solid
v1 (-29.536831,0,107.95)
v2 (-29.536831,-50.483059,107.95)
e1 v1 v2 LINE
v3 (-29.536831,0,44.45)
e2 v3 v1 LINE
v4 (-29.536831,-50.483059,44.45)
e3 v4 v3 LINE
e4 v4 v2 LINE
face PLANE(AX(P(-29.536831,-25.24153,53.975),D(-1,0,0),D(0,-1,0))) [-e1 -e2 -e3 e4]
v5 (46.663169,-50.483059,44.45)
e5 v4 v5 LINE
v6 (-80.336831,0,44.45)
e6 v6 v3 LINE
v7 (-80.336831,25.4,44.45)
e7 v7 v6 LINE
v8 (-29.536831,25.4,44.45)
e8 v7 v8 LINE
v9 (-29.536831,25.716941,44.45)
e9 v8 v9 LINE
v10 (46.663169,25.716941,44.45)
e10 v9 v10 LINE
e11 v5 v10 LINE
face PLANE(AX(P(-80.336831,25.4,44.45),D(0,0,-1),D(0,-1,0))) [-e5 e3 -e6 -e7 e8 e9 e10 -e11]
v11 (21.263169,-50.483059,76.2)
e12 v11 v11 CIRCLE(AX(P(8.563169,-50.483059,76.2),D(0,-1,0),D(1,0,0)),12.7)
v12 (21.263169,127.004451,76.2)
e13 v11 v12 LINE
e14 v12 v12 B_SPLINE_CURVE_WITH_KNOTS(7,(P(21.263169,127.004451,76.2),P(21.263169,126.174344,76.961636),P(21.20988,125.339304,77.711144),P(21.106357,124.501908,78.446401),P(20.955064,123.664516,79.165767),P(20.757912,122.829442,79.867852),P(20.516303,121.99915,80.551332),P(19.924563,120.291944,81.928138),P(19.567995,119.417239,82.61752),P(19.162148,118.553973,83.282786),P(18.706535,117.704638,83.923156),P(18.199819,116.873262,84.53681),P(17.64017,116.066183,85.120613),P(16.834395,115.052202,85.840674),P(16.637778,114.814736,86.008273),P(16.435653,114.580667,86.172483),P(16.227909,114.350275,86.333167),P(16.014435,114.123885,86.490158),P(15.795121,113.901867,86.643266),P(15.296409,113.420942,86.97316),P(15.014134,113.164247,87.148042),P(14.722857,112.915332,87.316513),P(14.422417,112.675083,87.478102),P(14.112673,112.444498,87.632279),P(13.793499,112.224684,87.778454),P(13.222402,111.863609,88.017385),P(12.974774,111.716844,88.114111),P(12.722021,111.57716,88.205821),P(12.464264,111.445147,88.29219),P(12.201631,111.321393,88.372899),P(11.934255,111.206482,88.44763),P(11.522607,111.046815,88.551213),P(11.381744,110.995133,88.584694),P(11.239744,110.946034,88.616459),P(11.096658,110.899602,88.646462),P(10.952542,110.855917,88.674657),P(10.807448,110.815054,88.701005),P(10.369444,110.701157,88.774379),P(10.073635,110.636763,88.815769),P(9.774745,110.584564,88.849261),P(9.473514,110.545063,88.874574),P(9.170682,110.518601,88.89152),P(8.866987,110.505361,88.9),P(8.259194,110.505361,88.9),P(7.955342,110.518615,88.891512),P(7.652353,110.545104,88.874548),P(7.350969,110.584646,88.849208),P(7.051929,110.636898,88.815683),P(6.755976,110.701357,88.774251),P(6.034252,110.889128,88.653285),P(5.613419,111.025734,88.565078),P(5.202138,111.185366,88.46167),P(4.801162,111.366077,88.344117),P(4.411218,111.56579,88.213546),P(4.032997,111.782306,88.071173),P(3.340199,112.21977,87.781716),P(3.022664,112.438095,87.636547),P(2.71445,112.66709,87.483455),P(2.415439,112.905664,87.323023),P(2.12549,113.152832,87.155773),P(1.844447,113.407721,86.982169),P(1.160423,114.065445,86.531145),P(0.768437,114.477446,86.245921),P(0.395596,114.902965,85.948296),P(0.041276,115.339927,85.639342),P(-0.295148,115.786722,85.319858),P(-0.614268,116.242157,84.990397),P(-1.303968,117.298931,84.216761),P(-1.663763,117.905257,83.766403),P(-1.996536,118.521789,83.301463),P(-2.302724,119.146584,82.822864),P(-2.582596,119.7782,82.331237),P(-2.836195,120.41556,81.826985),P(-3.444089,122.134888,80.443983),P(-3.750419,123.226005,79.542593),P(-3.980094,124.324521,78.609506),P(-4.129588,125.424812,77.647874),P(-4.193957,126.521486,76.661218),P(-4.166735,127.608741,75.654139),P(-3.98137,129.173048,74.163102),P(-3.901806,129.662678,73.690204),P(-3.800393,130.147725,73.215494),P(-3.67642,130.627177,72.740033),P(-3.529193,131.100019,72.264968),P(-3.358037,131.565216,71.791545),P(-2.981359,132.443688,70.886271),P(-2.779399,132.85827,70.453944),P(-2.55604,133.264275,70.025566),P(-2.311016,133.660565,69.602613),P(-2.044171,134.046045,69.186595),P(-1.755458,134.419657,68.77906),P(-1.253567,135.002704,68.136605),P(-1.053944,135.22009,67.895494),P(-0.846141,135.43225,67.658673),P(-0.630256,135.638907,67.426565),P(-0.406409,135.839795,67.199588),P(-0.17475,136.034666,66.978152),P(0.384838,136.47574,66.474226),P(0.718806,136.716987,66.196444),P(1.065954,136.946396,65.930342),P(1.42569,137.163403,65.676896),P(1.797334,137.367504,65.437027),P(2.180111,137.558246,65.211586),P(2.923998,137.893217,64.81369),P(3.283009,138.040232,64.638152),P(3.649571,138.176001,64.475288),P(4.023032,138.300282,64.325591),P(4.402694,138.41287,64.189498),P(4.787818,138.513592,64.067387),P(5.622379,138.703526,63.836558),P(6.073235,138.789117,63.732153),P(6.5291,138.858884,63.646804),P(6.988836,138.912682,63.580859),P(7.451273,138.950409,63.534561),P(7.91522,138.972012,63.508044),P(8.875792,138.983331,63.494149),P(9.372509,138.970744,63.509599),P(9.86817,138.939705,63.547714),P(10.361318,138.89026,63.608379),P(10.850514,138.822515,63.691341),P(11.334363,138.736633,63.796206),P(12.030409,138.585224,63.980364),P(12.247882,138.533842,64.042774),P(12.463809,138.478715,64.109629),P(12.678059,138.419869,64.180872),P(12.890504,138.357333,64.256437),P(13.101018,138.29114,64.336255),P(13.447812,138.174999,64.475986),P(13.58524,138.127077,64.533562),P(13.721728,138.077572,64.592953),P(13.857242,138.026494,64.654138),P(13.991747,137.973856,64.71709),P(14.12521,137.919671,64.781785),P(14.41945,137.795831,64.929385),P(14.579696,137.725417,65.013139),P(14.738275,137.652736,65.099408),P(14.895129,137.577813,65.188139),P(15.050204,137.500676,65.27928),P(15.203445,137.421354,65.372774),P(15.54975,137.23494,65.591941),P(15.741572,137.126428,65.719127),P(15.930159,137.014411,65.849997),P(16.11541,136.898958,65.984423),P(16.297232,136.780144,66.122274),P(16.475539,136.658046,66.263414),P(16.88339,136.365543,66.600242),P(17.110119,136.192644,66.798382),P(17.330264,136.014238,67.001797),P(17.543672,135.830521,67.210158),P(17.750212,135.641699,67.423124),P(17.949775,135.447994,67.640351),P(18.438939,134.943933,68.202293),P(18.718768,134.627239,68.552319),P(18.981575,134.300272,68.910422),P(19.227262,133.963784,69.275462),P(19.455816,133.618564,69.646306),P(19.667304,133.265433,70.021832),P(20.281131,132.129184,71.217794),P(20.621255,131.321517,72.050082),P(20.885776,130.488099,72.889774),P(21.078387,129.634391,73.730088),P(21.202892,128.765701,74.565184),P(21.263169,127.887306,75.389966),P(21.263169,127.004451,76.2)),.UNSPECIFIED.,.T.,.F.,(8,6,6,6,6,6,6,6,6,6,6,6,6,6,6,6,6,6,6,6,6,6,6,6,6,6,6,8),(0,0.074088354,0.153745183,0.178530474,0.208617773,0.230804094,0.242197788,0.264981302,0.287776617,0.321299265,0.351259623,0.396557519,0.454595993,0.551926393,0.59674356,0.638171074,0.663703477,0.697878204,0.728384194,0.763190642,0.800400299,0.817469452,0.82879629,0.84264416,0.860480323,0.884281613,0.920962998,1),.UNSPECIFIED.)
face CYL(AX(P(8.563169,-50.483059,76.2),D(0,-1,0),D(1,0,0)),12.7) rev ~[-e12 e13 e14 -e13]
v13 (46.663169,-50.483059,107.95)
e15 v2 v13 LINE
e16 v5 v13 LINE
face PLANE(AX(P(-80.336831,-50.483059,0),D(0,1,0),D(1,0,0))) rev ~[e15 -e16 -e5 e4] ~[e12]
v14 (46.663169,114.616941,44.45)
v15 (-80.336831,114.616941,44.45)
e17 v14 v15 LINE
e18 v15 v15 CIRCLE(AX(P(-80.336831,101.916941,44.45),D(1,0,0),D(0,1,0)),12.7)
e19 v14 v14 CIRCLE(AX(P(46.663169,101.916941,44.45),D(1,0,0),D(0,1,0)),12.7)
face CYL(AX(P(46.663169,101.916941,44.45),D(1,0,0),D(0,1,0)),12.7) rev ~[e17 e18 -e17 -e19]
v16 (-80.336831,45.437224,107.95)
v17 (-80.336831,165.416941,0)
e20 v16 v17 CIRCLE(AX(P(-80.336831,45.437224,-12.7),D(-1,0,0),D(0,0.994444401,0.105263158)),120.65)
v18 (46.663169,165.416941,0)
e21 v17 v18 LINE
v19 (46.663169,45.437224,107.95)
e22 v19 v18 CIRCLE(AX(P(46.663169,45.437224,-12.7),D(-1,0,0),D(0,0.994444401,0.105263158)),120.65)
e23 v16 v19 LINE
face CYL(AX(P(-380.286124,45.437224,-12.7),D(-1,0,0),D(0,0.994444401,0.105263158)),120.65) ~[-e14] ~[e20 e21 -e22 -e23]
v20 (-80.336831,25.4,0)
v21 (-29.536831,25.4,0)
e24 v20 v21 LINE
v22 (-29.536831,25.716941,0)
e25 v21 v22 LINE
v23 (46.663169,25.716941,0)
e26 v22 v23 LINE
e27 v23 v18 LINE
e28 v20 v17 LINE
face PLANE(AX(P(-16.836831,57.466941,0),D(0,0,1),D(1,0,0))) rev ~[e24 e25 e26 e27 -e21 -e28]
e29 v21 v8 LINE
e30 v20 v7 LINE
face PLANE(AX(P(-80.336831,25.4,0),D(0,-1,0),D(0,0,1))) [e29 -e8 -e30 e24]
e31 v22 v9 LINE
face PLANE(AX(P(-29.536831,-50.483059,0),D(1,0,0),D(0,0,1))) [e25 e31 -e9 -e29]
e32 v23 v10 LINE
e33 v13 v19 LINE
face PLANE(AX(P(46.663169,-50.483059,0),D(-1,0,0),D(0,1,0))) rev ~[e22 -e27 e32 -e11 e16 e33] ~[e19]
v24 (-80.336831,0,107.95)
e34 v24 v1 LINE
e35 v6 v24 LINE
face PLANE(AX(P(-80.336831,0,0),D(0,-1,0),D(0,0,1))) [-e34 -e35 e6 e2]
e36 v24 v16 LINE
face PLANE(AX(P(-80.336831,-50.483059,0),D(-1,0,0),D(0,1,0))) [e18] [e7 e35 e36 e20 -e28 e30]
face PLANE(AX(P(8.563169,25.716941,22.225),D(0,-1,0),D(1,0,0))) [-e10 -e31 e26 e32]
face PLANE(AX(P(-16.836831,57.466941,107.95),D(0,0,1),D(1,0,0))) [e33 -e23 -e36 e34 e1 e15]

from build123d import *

# Parameters (mm, degrees)
F0_W        = 127
F0_H        = 215.9
F1_DEPTH    = 107.95
F2_W        = 50.4830591381
F2_H        = 107.95
F3_DEPTH    = 50.8
F4_W        = 76.2
F4_H        = 44.45
F5_DEPTH    = 76.2
F8_T1_DEPTH = 726.8985851792
F6_R        = 12.7
F9_DEPTH    = 215.901
F7_R        = 12.7
F10_DEPTH   = 127
F11_W       = 25.4
F11_H       = 44.45
F12_DEPTH   = 50.8


# Not quite as in the source:
# - a fillet or chamfer that OpenCascade refuses, or shapes differently, is made with other operations: its cross-section is extruded or revolved along the edge and cut away or added


with BuildPart() as f1:
    # F0 (on Top) → F1 (new body)
    with BuildSketch(Plane.XY):
        with Locations((-16.8368311822, 57.4669408619)):
            Rectangle(F0_W, F0_H)
    extrude(amount=F1_DEPTH)

    # F2 (on face) → F3 (cut)
    with BuildSketch(Plane(origin=(-80.3368311822, 0, 0), x_dir=(0, -1, 0), z_dir=(-1, 0, 0))):
        with Locations((25.241529569, 53.975)):
            Rectangle(F2_W, F2_H)
    extrude(amount=-F3_DEPTH, mode=Mode.SUBTRACT)

    # F4 (on face) → F5 (cut)
    with BuildSketch(Plane.XZ.offset(50.4830591381)):
        with Locations((8.5631688178, 22.225)):
            Rectangle(F4_W, F4_H)
    extrude(amount=-F5_DEPTH, mode=Mode.SUBTRACT)

    # F8: fillet of radius 120.65 on 1 edges, made by hand

    # F8_s2 → F8_t1 (cut)
    with BuildSketch(Plane.YZ.offset(-380.2861237718)):
        with BuildLine():
            ThreePointArc((165.4169408619, 0), (126.1347067484, 76.9902377631), (45.4372238261, 107.95))
            Line((45.4372238261, 107.95), (165.4169408619, 107.95))
            Line((165.4169408619, 107.95), (165.4169408619, 0))
        make_face()
    extrude(amount=F8_T1_DEPTH, mode=Mode.SUBTRACT)

    # F6 (on face) → F9 (cut, through all)
    with BuildSketch(Plane.XZ.offset(50.4830591381)):
        with Locations((8.5631688178, 76.2)):
            Circle(F6_R)
    extrude(amount=-F9_DEPTH, mode=Mode.SUBTRACT)

    # F7 (on face) → F10 (cut)
    with BuildSketch(Plane.YZ.offset(46.6631688178)):
        with Locations((101.9169408619, 44.45)):
            Circle(F7_R)
    extrude(amount=-F10_DEPTH, mode=Mode.SUBTRACT)

    # F11 (on face) → F12 (cut)
    with BuildSketch(Plane(origin=(-80.3368311822, 0, 0), x_dir=(0, -1, 0), z_dir=(-1, 0, 0))):
        with Locations((-12.7, 22.225)):
            Rectangle(F11_W, F11_H)
    extrude(amount=-F12_DEPTH, mode=Mode.SUBTRACT)


solid = f1.part
